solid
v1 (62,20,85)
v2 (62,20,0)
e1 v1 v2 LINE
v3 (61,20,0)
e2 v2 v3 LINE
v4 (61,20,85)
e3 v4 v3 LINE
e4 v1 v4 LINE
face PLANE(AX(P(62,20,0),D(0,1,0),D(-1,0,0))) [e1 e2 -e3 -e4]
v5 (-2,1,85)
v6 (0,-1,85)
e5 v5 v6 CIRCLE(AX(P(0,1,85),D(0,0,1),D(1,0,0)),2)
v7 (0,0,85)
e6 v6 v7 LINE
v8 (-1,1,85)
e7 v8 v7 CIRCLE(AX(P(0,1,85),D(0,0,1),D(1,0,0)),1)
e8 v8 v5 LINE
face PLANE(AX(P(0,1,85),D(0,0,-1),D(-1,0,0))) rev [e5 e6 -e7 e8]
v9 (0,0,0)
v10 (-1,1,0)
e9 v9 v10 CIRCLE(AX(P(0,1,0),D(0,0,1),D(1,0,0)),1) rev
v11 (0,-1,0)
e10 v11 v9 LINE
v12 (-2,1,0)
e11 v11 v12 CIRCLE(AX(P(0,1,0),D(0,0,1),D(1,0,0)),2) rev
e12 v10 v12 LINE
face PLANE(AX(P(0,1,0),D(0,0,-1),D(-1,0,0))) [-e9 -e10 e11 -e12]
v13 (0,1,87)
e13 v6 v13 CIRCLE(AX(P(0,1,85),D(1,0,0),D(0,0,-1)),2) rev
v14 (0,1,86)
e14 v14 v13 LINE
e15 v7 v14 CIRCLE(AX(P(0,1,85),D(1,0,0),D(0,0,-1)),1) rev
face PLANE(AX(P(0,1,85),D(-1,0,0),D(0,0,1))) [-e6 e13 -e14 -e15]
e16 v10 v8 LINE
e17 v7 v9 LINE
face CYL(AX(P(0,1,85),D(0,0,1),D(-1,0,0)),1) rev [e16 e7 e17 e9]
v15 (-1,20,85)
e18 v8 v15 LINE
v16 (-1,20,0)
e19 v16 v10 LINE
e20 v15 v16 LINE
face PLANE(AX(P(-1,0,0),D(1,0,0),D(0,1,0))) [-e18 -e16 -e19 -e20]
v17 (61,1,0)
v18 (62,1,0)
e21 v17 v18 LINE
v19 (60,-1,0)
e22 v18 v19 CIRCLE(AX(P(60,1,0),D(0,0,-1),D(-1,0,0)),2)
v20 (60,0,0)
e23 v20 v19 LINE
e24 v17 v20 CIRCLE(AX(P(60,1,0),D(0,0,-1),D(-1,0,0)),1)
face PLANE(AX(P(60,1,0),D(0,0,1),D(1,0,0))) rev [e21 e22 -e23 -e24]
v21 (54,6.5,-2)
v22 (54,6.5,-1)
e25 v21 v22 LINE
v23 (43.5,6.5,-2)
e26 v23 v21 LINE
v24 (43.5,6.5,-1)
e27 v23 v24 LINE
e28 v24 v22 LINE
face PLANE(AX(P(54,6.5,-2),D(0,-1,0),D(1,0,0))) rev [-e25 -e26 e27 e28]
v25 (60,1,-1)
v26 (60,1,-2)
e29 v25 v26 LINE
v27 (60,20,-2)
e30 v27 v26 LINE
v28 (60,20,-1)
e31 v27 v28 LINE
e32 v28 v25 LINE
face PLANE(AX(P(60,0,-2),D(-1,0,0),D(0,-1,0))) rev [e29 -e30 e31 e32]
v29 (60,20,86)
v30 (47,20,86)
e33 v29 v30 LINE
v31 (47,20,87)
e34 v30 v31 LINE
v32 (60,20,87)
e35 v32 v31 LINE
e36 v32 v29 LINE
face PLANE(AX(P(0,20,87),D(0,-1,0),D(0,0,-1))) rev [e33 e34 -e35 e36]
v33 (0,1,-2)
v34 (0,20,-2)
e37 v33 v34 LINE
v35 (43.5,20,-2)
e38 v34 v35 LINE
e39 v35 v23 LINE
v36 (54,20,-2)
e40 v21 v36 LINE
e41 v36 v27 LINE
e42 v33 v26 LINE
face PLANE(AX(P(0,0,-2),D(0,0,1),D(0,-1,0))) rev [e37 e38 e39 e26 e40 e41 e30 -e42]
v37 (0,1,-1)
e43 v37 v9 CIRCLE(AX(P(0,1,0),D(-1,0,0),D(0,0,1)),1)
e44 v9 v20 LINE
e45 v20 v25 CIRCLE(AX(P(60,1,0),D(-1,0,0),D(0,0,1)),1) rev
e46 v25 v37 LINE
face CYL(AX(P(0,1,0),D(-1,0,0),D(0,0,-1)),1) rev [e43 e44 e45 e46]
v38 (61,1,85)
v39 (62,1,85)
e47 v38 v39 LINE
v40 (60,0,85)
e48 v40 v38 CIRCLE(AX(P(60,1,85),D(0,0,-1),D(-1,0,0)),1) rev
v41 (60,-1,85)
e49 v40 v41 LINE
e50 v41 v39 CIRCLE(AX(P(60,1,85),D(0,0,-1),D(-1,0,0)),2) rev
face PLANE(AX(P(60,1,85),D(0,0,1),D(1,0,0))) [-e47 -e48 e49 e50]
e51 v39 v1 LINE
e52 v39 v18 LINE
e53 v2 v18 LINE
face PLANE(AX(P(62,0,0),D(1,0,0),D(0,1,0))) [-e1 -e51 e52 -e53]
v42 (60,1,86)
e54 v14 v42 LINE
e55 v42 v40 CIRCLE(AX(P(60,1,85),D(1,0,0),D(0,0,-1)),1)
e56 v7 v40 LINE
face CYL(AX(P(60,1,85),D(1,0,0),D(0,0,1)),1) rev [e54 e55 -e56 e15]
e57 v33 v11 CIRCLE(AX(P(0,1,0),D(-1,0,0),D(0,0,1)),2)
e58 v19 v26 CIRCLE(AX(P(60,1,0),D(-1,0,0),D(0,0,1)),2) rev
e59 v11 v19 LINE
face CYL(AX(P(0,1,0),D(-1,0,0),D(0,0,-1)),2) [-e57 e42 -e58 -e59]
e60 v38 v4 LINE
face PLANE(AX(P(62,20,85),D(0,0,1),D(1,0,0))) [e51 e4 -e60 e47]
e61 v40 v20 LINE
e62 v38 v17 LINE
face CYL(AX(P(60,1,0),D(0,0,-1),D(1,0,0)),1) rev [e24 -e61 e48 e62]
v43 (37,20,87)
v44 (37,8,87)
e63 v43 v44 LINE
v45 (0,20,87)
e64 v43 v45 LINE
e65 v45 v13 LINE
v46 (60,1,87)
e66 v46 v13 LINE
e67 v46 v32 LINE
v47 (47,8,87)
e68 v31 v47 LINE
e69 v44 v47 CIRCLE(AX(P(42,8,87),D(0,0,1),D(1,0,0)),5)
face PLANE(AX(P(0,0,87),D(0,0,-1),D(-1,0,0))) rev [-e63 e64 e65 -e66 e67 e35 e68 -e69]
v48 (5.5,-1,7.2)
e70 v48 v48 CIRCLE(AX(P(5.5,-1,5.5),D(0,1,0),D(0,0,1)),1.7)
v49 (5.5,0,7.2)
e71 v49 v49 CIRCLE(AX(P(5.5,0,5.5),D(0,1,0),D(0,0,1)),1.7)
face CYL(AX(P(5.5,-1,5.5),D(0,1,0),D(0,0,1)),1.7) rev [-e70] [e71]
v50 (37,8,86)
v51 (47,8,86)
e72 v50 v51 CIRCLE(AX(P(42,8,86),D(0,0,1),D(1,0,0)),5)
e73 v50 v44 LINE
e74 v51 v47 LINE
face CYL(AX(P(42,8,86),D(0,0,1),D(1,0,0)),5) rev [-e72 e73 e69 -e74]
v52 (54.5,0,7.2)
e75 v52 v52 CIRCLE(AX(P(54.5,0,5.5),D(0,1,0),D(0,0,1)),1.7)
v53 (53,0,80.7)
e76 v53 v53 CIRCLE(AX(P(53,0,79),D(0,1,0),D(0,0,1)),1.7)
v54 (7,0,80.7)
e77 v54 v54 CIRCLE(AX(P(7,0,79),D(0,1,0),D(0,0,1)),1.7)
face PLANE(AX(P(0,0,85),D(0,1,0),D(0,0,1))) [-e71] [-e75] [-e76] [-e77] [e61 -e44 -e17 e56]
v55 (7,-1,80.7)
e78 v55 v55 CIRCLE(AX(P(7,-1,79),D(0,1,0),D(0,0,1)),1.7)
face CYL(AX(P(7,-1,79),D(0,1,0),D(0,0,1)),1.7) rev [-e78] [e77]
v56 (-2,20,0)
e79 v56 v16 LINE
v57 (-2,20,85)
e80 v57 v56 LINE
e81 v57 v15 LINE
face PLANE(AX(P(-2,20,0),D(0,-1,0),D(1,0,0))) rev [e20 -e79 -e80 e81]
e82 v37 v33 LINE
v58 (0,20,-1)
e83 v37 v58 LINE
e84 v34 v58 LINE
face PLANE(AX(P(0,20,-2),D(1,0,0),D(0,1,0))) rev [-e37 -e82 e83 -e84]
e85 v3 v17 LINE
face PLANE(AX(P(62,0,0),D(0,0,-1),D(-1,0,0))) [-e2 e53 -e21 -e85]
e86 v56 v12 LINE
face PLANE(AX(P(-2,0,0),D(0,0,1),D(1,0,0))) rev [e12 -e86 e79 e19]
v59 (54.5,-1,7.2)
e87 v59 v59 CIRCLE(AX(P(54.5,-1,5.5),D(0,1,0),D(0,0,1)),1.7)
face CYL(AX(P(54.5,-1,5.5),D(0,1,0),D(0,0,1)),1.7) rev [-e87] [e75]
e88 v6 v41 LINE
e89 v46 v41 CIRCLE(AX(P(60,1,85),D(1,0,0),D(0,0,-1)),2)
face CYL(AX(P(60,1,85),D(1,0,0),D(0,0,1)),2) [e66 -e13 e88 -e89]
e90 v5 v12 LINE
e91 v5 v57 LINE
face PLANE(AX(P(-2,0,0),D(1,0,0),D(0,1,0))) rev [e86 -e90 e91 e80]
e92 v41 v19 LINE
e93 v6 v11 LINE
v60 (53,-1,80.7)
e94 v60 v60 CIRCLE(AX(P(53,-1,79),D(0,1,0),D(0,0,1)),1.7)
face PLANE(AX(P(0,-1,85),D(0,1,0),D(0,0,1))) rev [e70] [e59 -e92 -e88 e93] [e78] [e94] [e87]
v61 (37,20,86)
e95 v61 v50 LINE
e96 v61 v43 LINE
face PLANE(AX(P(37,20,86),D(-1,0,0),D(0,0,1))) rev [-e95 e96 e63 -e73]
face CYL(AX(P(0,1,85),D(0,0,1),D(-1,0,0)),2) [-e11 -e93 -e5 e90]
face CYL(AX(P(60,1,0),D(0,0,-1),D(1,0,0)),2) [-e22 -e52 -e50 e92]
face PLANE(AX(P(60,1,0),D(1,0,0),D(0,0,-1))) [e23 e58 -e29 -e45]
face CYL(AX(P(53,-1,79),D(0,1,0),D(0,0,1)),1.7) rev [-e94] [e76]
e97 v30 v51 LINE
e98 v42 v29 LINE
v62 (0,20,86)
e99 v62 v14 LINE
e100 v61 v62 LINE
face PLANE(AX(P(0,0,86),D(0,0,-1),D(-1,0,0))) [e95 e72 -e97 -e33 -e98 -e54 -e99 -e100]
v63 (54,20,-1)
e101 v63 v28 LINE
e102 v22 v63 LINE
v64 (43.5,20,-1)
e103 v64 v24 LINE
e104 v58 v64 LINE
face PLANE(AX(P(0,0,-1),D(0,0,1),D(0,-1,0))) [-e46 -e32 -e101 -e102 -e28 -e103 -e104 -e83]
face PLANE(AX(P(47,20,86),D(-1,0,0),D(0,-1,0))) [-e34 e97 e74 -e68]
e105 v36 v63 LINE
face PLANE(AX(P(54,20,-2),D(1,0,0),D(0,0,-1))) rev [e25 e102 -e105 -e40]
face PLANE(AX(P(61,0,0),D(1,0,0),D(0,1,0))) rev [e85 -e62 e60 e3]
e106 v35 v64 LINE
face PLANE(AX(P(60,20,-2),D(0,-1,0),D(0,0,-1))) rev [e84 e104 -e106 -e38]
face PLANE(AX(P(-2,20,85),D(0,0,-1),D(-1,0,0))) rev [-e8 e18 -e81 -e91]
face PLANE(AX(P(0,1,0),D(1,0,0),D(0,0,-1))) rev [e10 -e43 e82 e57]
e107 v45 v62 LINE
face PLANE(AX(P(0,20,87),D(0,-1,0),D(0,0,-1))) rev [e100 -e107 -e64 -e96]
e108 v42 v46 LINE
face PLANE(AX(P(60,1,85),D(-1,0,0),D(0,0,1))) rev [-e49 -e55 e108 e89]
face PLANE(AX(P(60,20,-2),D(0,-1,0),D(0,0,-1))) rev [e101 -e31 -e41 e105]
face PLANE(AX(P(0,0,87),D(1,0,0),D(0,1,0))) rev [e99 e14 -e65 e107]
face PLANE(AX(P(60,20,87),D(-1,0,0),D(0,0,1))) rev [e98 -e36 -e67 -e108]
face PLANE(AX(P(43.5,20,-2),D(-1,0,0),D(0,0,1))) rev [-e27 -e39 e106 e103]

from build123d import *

# Parameters (mm, degrees)
SKETCH2_W          = 60
SKETCH2_H          = 1
BASE_FLANGE1_DEPTH = 85
EDGE_FLANGE1_DEPTH = 85
EDGE_FLANGE2_DEPTH = 85
EDGE_FLANGE3_DEPTH = 60
EDGE_FLANGE4_DEPTH = 60
CUT_EXTRUDE4_DEPTH = 1
SKETCH20_W         = 10.5
SKETCH20_H         = 13.5
CUT_EXTRUDE5_DEPTH = 1
SKETCH21_R         = 1.7
CUT_EXTRUDE6_DEPTH = 109.687625791


# Sheet-metal steps are written as plain solids
with BuildPart() as part:
    # Sketch2 → Base-Flange1 (new body)
    with BuildSketch(Plane.XY):
        with Locations((30, -0.5)):
            Rectangle(SKETCH2_W, SKETCH2_H)
    extrude(amount=BASE_FLANGE1_DEPTH)

    # Edge-Flange1 section (across the edge) → Edge-Flange1 (add)
    with BuildSketch(Plane(origin=(61, 0, 85), x_dir=(-1, 0, 0), z_dir=(0, 0, -1))):
        with BuildLine():
            Line((-1, 1), (-1, 20))
            Line((-1, 20), (0, 20))
            Line((0, 20), (0, 1))
            ThreePointArc((0, 1), (0.292893219, 0.292893219), (1, 0))
            Line((1, 0), (1, -1))
            ThreePointArc((1, -1), (-0.414213562, -0.414213562), (-1, 1))
        make_face()
    extrude(amount=EDGE_FLANGE1_DEPTH)

    # Edge-Flange2 section (across the edge) → Edge-Flange2 (add)
    with BuildSketch(Plane(origin=(-1, 0, 0), x_dir=(1, 0, 0), z_dir=(0, 0, 1))):
        with BuildLine():
            Line((-1, 1), (-1, 20))
            Line((-1, 20), (0, 20))
            Line((0, 20), (0, 1))
            ThreePointArc((0, 1), (0.292893219, 0.292893219), (1, 0))
            Line((1, 0), (1, -1))
            ThreePointArc((1, -1), (-0.414213562, -0.414213562), (-1, 1))
        make_face()
    extrude(amount=EDGE_FLANGE2_DEPTH)

    # Edge-Flange3 section (across the edge) → Edge-Flange3 (add)
    with BuildSketch(Plane(origin=(0, 0, 86), x_dir=(0, 0, -1), z_dir=(1, 0, 0))):
        with BuildLine():
            Line((-1, 1), (-1, 20))
            Line((-1, 20), (0, 20))
            Line((0, 20), (0, 1))
            ThreePointArc((0, 1), (0.292893219, 0.292893219), (1, 0))
            Line((1, 0), (1, -1))
            ThreePointArc((1, -1), (-0.414213562, -0.414213562), (-1, 1))
        make_face()
    extrude(amount=EDGE_FLANGE3_DEPTH)

    # Edge-Flange4 section (across the edge) → Edge-Flange4 (add)
    with BuildSketch(Plane(origin=(60, 0, -1), x_dir=(0, 0, 1), z_dir=(-1, 0, 0))):
        with BuildLine():
            Line((-1, 1), (-1, 20))
            Line((-1, 20), (0, 20))
            Line((0, 20), (0, 1))
            ThreePointArc((0, 1), (0.292893219, 0.292893219), (1, 0))
            Line((1, 0), (1, -1))
            ThreePointArc((1, -1), (-0.414213562, -0.414213562), (-1, 1))
        make_face()
    extrude(amount=EDGE_FLANGE4_DEPTH)

    # Sketch19 → Cut-Extrude4 (cut)
    with BuildSketch(Plane.XY.offset(87)):
        with BuildLine():
            Line((47, 20), (47, 8))
            ThreePointArc((47, 8), (42, 3), (37, 8))
            Line((37, 8), (37, 20))
            Line((37, 20), (47, 20))
        make_face()
    extrude(amount=-CUT_EXTRUDE4_DEPTH, mode=Mode.SUBTRACT)

    # Sketch20 → Cut-Extrude5 (cut)
    with BuildSketch(Plane.XY.offset(-1)):
        with Locations((48.75, 13.25)):
            Rectangle(SKETCH20_W, SKETCH20_H)
    extrude(amount=-CUT_EXTRUDE5_DEPTH, mode=Mode.SUBTRACT)

    # Sketch21 → Cut-Extrude6 (cut, through all)
    with BuildSketch(Plane(origin=(0, 0, 0), x_dir=(1, 0, 0), z_dir=(0, 1, 0))):
        with Locations(Location((5.5, -5.5, 0), (0, 0, 270))):
            Circle(SKETCH21_R)
        with Locations(Location((54.5, -5.5, 0), (0, 0, 270))):
            Circle(SKETCH21_R)
        with Locations(Location((53, -79, 0), (0, 0, 270))):
            Circle(SKETCH21_R)
        with Locations(Location((7, -79, 0), (0, 0, 270))):
            Circle(SKETCH21_R)
    extrude(amount=-CUT_EXTRUDE6_DEPTH, mode=Mode.SUBTRACT)


solid = part.part
